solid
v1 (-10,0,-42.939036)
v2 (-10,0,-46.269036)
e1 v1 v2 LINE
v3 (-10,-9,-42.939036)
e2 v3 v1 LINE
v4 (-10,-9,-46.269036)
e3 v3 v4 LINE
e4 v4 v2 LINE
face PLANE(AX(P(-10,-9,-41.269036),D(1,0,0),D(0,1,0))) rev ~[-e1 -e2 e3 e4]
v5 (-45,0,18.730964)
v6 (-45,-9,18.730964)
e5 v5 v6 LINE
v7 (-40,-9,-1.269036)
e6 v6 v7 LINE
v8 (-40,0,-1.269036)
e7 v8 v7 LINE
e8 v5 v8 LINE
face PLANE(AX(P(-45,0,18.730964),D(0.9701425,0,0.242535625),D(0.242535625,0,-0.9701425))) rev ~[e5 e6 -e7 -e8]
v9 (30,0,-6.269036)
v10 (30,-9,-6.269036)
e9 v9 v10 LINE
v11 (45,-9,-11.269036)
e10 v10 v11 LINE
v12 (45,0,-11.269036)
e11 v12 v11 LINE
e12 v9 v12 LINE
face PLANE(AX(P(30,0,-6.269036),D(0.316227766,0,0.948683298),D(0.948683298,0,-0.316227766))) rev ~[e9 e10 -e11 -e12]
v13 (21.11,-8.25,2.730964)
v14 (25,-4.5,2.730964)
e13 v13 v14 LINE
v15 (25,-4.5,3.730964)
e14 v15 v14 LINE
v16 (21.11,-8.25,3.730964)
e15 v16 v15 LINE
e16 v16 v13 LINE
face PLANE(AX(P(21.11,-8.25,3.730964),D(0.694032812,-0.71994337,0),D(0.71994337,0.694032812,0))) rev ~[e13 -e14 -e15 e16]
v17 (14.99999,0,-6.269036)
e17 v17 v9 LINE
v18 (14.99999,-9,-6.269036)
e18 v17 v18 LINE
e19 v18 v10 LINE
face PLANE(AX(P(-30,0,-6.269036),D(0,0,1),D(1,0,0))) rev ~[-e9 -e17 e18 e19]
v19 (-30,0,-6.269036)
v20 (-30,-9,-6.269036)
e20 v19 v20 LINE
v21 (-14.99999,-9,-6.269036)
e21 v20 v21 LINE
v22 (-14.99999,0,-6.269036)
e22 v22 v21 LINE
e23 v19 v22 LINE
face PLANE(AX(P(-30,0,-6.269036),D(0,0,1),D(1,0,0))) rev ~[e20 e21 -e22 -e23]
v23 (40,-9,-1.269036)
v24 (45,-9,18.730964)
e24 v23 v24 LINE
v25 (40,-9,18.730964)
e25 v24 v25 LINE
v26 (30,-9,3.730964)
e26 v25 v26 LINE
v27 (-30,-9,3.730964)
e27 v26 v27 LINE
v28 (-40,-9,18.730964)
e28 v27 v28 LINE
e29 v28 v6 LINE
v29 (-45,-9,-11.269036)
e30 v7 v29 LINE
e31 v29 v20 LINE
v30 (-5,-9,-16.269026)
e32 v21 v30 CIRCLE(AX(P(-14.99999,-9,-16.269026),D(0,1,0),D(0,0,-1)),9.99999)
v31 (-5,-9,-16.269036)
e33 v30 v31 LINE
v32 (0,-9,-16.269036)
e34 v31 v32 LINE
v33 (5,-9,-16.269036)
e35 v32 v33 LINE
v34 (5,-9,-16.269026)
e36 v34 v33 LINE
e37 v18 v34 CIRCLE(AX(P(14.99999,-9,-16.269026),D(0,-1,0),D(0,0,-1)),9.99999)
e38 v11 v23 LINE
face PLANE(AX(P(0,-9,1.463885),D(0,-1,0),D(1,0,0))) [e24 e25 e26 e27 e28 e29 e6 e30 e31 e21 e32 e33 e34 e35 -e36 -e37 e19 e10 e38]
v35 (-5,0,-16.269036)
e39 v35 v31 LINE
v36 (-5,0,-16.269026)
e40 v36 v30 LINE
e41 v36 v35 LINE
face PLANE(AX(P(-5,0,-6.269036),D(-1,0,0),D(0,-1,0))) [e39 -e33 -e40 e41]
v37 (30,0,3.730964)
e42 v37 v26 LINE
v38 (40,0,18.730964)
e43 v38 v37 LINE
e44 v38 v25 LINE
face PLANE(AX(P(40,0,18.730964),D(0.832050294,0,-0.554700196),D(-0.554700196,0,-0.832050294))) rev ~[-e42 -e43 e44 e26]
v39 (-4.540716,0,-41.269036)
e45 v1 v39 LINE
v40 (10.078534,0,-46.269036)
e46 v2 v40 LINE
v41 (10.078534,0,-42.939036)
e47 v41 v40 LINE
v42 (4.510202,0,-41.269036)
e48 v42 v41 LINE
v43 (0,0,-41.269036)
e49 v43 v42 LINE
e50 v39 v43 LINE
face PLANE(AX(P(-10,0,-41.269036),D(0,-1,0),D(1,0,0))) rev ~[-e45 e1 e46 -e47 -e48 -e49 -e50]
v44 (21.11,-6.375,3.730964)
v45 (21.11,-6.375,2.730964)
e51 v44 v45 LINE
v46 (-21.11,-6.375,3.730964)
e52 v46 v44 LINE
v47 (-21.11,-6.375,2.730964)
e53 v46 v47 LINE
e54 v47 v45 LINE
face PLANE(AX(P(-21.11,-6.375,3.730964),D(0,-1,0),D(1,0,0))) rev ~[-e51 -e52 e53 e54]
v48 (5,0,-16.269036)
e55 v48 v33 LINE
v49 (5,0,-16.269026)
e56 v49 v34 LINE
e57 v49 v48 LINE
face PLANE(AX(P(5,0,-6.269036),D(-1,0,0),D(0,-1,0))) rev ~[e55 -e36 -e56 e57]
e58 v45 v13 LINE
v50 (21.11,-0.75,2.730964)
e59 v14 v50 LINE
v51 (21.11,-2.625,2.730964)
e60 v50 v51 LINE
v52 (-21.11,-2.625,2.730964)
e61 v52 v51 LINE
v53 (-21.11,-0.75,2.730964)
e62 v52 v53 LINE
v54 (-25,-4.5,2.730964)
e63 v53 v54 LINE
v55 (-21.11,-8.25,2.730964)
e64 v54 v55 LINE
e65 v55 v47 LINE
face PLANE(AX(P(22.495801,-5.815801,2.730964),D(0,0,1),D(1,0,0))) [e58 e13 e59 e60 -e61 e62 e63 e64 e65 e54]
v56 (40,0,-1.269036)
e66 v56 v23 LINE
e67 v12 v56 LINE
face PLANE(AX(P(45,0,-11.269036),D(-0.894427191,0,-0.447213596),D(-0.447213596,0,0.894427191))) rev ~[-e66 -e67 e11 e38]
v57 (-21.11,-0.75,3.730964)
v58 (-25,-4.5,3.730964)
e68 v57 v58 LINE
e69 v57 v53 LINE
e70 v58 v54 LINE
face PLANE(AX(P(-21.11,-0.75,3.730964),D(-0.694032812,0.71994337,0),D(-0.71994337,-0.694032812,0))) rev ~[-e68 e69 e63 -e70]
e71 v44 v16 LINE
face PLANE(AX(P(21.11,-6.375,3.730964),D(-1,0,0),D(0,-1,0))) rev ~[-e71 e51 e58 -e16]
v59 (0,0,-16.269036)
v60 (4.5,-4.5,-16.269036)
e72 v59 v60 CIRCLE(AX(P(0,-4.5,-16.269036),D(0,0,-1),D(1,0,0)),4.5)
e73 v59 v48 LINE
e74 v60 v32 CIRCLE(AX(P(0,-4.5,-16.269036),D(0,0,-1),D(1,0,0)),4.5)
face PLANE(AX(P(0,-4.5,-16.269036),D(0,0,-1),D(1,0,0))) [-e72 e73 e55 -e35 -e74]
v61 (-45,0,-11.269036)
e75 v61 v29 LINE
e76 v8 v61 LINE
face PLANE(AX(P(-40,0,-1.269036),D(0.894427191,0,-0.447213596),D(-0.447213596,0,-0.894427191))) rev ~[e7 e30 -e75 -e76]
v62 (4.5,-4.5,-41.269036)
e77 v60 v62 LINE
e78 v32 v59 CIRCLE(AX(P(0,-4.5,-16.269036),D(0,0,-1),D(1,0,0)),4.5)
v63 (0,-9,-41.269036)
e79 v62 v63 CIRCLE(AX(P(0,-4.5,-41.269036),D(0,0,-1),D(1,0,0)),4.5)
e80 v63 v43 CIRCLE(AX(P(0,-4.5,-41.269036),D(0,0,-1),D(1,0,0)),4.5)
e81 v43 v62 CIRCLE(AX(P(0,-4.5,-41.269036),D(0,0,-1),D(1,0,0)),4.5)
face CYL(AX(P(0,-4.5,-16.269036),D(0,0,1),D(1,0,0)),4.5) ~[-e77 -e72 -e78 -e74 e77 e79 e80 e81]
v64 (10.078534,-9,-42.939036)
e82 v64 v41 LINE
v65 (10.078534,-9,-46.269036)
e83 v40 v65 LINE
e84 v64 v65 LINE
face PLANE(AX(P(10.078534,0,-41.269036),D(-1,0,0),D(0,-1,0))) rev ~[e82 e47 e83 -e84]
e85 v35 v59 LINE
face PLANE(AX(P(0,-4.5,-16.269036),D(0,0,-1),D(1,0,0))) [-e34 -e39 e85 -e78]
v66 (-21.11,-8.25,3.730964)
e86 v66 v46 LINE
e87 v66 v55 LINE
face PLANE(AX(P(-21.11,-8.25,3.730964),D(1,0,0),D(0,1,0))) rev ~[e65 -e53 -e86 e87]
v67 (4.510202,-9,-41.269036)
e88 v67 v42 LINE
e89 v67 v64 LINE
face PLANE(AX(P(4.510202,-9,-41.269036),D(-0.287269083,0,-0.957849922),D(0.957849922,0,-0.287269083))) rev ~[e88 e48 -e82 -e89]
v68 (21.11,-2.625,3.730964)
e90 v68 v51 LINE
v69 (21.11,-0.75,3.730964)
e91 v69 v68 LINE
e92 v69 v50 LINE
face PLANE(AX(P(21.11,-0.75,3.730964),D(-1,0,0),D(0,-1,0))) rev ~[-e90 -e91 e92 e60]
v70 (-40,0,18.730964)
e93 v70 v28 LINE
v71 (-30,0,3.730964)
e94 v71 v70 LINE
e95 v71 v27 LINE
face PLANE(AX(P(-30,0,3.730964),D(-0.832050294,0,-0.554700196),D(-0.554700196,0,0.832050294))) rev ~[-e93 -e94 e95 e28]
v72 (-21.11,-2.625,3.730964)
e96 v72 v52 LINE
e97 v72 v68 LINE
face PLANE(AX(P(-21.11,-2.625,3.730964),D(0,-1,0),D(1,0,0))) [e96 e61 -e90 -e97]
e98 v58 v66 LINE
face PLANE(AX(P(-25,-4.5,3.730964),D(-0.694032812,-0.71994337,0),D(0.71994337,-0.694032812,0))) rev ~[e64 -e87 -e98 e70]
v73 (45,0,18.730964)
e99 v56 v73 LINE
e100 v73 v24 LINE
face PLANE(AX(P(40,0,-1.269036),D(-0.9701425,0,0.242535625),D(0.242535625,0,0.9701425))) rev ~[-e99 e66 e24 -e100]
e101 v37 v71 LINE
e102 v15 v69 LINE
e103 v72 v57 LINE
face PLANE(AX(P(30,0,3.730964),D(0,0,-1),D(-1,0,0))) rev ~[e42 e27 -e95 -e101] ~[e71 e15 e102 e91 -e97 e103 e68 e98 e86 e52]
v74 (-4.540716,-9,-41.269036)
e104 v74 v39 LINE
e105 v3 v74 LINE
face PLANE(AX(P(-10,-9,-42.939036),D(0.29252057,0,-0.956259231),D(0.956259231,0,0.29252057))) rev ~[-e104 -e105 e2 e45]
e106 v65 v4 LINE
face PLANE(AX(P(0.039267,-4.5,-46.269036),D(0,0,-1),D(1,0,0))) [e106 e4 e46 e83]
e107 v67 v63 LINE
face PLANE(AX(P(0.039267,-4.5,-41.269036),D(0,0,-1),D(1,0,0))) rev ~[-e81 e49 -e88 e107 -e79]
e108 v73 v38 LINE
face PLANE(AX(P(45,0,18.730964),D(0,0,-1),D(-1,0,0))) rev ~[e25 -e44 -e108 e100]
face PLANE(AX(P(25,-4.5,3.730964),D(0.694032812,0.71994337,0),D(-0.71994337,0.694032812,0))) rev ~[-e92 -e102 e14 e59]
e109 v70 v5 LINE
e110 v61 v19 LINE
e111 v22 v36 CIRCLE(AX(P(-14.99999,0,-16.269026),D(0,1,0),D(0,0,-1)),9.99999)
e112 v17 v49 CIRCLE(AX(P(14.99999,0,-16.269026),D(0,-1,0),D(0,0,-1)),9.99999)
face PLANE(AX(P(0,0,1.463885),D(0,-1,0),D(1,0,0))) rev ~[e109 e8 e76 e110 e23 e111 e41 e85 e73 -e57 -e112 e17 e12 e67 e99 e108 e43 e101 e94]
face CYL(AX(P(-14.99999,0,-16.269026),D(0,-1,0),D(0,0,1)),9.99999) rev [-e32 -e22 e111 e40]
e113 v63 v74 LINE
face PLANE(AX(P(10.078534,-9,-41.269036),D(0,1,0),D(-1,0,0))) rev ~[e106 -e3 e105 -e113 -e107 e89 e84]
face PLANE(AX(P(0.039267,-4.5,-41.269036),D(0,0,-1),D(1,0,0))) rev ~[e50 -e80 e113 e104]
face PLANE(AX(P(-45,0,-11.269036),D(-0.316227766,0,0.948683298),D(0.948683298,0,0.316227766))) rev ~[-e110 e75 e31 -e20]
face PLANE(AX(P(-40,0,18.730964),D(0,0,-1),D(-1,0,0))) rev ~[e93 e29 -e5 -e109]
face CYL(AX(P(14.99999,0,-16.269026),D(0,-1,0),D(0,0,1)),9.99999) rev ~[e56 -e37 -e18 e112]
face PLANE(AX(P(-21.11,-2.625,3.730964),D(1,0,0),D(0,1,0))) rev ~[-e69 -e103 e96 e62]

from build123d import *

# Parameters (mm, degrees)
F1_DEPTH  = 9
F2_W      = 42.22
F2_H      = 1.875
F3_DEPTH  = 1
F4_W      = 10
F4_H      = 9
F5_DEPTH  = 10
F6_R      = 9.99999
F7_R      = 4.5
F8_DEPTH  = 25
F10_DEPTH = 5
F12_DEPTH = 25


# Not quite as in the source:
# - a fillet or chamfer is up to 0.001 mm smaller than in the source, because OpenCascade refuses the exact size


with BuildPart() as f1:
    # F0 (on Front) → F1 (new body)
    with BuildSketch(Plane.XZ):
        Polygon((30, 3.7309644414), (0, 3.7309644414), (-30, 3.7309644414), (-40, 18.7309644414), (-45, 18.7309644414), (-40, -1.2690355586), (-45, -11.2690355586), (-30, -6.2690355586), (0, -6.2690355586), (30, -6.2690355586), (45, -11.2690355586), (40, -1.2690355586), (45, 18.7309644414), (40, 18.7309644414), align=None)
    extrude(amount=F1_DEPTH)

    # F2 (on face) → F3 (cut)
    with BuildSketch(Plane.XY.offset(3.7309644414)):
        Polygon((21.11, -8.25), (25, -4.5), (21.11, -4.5), (21.11, -6.375), align=None)
        Polygon((21.11, -4.5), (25, -4.5), (21.11, -0.75), (21.11, -2.625), align=None)
        with Locations((0, -5.4375)):
            Rectangle(F2_W, F2_H)
        with Locations((0, -3.5625)):
            Rectangle(F2_W, F2_H)
        Polygon((-21.11, -6.375), (-21.11, -4.5), (-25, -4.5), (-21.11, -8.25), align=None)
        Polygon((-25, -4.5), (-21.11, -4.5), (-21.11, -2.625), (-21.11, -0.75), align=None)
    extrude(amount=-F3_DEPTH, mode=Mode.SUBTRACT)

    # F4 (on face) → F5 (join)
    with BuildSketch(Plane(origin=(0, 0, -6.2690355586), x_dir=(1, 0, 0), z_dir=(0, 0, -1))):
        with Locations((0, 4.5)):
            Rectangle(F4_W, F4_H)
    extrude(amount=F5_DEPTH)

    # F6 (radius 10 in the source; OpenCascade refuses exactly that, so slightly less here)
    f6_edges = [f1.edges().sort_by_distance(p)[0] for p in [
        (5, -4.5, -6.269036),
        (-5, -4.5, -6.269036),
    ]]
    fillet(f6_edges, radius=F6_R)

    # F7 (on face) → F8 (join)
    with BuildSketch(Plane(origin=(0, 0, -16.2690355586), x_dir=(1, 0, 0), z_dir=(0, 0, -1))):
        with Locations((0, 4.5)):
            Circle(F7_R)
    extrude(amount=F8_DEPTH)

    # F9 (on face) → F10 (join)
    with BuildSketch(Plane(origin=(0, 0, -41.2690355586), x_dir=(1, 0, 0), z_dir=(0, 0, -1))):
        Polygon((-10, 0), (0, 0), (10.0785335526, 0), (10.0785335526, 9), (0, 9), (-10, 9), align=None)
    extrude(amount=F10_DEPTH)

    # F11 (on face) → F12 (cut)
    with BuildSketch(Plane.XZ.offset(9)):
        Polygon((-10, -41.2690355586), (-10, -42.9390355586), (-4.5407158323, -41.2690355586), align=None)
        Polygon((10.0785335526, -41.2690355586), (4.5102024451, -41.2690355586), (10.0785335526, -42.9390355586), align=None)
    extrude(amount=-F12_DEPTH, mode=Mode.SUBTRACT)


solid = f1.part
